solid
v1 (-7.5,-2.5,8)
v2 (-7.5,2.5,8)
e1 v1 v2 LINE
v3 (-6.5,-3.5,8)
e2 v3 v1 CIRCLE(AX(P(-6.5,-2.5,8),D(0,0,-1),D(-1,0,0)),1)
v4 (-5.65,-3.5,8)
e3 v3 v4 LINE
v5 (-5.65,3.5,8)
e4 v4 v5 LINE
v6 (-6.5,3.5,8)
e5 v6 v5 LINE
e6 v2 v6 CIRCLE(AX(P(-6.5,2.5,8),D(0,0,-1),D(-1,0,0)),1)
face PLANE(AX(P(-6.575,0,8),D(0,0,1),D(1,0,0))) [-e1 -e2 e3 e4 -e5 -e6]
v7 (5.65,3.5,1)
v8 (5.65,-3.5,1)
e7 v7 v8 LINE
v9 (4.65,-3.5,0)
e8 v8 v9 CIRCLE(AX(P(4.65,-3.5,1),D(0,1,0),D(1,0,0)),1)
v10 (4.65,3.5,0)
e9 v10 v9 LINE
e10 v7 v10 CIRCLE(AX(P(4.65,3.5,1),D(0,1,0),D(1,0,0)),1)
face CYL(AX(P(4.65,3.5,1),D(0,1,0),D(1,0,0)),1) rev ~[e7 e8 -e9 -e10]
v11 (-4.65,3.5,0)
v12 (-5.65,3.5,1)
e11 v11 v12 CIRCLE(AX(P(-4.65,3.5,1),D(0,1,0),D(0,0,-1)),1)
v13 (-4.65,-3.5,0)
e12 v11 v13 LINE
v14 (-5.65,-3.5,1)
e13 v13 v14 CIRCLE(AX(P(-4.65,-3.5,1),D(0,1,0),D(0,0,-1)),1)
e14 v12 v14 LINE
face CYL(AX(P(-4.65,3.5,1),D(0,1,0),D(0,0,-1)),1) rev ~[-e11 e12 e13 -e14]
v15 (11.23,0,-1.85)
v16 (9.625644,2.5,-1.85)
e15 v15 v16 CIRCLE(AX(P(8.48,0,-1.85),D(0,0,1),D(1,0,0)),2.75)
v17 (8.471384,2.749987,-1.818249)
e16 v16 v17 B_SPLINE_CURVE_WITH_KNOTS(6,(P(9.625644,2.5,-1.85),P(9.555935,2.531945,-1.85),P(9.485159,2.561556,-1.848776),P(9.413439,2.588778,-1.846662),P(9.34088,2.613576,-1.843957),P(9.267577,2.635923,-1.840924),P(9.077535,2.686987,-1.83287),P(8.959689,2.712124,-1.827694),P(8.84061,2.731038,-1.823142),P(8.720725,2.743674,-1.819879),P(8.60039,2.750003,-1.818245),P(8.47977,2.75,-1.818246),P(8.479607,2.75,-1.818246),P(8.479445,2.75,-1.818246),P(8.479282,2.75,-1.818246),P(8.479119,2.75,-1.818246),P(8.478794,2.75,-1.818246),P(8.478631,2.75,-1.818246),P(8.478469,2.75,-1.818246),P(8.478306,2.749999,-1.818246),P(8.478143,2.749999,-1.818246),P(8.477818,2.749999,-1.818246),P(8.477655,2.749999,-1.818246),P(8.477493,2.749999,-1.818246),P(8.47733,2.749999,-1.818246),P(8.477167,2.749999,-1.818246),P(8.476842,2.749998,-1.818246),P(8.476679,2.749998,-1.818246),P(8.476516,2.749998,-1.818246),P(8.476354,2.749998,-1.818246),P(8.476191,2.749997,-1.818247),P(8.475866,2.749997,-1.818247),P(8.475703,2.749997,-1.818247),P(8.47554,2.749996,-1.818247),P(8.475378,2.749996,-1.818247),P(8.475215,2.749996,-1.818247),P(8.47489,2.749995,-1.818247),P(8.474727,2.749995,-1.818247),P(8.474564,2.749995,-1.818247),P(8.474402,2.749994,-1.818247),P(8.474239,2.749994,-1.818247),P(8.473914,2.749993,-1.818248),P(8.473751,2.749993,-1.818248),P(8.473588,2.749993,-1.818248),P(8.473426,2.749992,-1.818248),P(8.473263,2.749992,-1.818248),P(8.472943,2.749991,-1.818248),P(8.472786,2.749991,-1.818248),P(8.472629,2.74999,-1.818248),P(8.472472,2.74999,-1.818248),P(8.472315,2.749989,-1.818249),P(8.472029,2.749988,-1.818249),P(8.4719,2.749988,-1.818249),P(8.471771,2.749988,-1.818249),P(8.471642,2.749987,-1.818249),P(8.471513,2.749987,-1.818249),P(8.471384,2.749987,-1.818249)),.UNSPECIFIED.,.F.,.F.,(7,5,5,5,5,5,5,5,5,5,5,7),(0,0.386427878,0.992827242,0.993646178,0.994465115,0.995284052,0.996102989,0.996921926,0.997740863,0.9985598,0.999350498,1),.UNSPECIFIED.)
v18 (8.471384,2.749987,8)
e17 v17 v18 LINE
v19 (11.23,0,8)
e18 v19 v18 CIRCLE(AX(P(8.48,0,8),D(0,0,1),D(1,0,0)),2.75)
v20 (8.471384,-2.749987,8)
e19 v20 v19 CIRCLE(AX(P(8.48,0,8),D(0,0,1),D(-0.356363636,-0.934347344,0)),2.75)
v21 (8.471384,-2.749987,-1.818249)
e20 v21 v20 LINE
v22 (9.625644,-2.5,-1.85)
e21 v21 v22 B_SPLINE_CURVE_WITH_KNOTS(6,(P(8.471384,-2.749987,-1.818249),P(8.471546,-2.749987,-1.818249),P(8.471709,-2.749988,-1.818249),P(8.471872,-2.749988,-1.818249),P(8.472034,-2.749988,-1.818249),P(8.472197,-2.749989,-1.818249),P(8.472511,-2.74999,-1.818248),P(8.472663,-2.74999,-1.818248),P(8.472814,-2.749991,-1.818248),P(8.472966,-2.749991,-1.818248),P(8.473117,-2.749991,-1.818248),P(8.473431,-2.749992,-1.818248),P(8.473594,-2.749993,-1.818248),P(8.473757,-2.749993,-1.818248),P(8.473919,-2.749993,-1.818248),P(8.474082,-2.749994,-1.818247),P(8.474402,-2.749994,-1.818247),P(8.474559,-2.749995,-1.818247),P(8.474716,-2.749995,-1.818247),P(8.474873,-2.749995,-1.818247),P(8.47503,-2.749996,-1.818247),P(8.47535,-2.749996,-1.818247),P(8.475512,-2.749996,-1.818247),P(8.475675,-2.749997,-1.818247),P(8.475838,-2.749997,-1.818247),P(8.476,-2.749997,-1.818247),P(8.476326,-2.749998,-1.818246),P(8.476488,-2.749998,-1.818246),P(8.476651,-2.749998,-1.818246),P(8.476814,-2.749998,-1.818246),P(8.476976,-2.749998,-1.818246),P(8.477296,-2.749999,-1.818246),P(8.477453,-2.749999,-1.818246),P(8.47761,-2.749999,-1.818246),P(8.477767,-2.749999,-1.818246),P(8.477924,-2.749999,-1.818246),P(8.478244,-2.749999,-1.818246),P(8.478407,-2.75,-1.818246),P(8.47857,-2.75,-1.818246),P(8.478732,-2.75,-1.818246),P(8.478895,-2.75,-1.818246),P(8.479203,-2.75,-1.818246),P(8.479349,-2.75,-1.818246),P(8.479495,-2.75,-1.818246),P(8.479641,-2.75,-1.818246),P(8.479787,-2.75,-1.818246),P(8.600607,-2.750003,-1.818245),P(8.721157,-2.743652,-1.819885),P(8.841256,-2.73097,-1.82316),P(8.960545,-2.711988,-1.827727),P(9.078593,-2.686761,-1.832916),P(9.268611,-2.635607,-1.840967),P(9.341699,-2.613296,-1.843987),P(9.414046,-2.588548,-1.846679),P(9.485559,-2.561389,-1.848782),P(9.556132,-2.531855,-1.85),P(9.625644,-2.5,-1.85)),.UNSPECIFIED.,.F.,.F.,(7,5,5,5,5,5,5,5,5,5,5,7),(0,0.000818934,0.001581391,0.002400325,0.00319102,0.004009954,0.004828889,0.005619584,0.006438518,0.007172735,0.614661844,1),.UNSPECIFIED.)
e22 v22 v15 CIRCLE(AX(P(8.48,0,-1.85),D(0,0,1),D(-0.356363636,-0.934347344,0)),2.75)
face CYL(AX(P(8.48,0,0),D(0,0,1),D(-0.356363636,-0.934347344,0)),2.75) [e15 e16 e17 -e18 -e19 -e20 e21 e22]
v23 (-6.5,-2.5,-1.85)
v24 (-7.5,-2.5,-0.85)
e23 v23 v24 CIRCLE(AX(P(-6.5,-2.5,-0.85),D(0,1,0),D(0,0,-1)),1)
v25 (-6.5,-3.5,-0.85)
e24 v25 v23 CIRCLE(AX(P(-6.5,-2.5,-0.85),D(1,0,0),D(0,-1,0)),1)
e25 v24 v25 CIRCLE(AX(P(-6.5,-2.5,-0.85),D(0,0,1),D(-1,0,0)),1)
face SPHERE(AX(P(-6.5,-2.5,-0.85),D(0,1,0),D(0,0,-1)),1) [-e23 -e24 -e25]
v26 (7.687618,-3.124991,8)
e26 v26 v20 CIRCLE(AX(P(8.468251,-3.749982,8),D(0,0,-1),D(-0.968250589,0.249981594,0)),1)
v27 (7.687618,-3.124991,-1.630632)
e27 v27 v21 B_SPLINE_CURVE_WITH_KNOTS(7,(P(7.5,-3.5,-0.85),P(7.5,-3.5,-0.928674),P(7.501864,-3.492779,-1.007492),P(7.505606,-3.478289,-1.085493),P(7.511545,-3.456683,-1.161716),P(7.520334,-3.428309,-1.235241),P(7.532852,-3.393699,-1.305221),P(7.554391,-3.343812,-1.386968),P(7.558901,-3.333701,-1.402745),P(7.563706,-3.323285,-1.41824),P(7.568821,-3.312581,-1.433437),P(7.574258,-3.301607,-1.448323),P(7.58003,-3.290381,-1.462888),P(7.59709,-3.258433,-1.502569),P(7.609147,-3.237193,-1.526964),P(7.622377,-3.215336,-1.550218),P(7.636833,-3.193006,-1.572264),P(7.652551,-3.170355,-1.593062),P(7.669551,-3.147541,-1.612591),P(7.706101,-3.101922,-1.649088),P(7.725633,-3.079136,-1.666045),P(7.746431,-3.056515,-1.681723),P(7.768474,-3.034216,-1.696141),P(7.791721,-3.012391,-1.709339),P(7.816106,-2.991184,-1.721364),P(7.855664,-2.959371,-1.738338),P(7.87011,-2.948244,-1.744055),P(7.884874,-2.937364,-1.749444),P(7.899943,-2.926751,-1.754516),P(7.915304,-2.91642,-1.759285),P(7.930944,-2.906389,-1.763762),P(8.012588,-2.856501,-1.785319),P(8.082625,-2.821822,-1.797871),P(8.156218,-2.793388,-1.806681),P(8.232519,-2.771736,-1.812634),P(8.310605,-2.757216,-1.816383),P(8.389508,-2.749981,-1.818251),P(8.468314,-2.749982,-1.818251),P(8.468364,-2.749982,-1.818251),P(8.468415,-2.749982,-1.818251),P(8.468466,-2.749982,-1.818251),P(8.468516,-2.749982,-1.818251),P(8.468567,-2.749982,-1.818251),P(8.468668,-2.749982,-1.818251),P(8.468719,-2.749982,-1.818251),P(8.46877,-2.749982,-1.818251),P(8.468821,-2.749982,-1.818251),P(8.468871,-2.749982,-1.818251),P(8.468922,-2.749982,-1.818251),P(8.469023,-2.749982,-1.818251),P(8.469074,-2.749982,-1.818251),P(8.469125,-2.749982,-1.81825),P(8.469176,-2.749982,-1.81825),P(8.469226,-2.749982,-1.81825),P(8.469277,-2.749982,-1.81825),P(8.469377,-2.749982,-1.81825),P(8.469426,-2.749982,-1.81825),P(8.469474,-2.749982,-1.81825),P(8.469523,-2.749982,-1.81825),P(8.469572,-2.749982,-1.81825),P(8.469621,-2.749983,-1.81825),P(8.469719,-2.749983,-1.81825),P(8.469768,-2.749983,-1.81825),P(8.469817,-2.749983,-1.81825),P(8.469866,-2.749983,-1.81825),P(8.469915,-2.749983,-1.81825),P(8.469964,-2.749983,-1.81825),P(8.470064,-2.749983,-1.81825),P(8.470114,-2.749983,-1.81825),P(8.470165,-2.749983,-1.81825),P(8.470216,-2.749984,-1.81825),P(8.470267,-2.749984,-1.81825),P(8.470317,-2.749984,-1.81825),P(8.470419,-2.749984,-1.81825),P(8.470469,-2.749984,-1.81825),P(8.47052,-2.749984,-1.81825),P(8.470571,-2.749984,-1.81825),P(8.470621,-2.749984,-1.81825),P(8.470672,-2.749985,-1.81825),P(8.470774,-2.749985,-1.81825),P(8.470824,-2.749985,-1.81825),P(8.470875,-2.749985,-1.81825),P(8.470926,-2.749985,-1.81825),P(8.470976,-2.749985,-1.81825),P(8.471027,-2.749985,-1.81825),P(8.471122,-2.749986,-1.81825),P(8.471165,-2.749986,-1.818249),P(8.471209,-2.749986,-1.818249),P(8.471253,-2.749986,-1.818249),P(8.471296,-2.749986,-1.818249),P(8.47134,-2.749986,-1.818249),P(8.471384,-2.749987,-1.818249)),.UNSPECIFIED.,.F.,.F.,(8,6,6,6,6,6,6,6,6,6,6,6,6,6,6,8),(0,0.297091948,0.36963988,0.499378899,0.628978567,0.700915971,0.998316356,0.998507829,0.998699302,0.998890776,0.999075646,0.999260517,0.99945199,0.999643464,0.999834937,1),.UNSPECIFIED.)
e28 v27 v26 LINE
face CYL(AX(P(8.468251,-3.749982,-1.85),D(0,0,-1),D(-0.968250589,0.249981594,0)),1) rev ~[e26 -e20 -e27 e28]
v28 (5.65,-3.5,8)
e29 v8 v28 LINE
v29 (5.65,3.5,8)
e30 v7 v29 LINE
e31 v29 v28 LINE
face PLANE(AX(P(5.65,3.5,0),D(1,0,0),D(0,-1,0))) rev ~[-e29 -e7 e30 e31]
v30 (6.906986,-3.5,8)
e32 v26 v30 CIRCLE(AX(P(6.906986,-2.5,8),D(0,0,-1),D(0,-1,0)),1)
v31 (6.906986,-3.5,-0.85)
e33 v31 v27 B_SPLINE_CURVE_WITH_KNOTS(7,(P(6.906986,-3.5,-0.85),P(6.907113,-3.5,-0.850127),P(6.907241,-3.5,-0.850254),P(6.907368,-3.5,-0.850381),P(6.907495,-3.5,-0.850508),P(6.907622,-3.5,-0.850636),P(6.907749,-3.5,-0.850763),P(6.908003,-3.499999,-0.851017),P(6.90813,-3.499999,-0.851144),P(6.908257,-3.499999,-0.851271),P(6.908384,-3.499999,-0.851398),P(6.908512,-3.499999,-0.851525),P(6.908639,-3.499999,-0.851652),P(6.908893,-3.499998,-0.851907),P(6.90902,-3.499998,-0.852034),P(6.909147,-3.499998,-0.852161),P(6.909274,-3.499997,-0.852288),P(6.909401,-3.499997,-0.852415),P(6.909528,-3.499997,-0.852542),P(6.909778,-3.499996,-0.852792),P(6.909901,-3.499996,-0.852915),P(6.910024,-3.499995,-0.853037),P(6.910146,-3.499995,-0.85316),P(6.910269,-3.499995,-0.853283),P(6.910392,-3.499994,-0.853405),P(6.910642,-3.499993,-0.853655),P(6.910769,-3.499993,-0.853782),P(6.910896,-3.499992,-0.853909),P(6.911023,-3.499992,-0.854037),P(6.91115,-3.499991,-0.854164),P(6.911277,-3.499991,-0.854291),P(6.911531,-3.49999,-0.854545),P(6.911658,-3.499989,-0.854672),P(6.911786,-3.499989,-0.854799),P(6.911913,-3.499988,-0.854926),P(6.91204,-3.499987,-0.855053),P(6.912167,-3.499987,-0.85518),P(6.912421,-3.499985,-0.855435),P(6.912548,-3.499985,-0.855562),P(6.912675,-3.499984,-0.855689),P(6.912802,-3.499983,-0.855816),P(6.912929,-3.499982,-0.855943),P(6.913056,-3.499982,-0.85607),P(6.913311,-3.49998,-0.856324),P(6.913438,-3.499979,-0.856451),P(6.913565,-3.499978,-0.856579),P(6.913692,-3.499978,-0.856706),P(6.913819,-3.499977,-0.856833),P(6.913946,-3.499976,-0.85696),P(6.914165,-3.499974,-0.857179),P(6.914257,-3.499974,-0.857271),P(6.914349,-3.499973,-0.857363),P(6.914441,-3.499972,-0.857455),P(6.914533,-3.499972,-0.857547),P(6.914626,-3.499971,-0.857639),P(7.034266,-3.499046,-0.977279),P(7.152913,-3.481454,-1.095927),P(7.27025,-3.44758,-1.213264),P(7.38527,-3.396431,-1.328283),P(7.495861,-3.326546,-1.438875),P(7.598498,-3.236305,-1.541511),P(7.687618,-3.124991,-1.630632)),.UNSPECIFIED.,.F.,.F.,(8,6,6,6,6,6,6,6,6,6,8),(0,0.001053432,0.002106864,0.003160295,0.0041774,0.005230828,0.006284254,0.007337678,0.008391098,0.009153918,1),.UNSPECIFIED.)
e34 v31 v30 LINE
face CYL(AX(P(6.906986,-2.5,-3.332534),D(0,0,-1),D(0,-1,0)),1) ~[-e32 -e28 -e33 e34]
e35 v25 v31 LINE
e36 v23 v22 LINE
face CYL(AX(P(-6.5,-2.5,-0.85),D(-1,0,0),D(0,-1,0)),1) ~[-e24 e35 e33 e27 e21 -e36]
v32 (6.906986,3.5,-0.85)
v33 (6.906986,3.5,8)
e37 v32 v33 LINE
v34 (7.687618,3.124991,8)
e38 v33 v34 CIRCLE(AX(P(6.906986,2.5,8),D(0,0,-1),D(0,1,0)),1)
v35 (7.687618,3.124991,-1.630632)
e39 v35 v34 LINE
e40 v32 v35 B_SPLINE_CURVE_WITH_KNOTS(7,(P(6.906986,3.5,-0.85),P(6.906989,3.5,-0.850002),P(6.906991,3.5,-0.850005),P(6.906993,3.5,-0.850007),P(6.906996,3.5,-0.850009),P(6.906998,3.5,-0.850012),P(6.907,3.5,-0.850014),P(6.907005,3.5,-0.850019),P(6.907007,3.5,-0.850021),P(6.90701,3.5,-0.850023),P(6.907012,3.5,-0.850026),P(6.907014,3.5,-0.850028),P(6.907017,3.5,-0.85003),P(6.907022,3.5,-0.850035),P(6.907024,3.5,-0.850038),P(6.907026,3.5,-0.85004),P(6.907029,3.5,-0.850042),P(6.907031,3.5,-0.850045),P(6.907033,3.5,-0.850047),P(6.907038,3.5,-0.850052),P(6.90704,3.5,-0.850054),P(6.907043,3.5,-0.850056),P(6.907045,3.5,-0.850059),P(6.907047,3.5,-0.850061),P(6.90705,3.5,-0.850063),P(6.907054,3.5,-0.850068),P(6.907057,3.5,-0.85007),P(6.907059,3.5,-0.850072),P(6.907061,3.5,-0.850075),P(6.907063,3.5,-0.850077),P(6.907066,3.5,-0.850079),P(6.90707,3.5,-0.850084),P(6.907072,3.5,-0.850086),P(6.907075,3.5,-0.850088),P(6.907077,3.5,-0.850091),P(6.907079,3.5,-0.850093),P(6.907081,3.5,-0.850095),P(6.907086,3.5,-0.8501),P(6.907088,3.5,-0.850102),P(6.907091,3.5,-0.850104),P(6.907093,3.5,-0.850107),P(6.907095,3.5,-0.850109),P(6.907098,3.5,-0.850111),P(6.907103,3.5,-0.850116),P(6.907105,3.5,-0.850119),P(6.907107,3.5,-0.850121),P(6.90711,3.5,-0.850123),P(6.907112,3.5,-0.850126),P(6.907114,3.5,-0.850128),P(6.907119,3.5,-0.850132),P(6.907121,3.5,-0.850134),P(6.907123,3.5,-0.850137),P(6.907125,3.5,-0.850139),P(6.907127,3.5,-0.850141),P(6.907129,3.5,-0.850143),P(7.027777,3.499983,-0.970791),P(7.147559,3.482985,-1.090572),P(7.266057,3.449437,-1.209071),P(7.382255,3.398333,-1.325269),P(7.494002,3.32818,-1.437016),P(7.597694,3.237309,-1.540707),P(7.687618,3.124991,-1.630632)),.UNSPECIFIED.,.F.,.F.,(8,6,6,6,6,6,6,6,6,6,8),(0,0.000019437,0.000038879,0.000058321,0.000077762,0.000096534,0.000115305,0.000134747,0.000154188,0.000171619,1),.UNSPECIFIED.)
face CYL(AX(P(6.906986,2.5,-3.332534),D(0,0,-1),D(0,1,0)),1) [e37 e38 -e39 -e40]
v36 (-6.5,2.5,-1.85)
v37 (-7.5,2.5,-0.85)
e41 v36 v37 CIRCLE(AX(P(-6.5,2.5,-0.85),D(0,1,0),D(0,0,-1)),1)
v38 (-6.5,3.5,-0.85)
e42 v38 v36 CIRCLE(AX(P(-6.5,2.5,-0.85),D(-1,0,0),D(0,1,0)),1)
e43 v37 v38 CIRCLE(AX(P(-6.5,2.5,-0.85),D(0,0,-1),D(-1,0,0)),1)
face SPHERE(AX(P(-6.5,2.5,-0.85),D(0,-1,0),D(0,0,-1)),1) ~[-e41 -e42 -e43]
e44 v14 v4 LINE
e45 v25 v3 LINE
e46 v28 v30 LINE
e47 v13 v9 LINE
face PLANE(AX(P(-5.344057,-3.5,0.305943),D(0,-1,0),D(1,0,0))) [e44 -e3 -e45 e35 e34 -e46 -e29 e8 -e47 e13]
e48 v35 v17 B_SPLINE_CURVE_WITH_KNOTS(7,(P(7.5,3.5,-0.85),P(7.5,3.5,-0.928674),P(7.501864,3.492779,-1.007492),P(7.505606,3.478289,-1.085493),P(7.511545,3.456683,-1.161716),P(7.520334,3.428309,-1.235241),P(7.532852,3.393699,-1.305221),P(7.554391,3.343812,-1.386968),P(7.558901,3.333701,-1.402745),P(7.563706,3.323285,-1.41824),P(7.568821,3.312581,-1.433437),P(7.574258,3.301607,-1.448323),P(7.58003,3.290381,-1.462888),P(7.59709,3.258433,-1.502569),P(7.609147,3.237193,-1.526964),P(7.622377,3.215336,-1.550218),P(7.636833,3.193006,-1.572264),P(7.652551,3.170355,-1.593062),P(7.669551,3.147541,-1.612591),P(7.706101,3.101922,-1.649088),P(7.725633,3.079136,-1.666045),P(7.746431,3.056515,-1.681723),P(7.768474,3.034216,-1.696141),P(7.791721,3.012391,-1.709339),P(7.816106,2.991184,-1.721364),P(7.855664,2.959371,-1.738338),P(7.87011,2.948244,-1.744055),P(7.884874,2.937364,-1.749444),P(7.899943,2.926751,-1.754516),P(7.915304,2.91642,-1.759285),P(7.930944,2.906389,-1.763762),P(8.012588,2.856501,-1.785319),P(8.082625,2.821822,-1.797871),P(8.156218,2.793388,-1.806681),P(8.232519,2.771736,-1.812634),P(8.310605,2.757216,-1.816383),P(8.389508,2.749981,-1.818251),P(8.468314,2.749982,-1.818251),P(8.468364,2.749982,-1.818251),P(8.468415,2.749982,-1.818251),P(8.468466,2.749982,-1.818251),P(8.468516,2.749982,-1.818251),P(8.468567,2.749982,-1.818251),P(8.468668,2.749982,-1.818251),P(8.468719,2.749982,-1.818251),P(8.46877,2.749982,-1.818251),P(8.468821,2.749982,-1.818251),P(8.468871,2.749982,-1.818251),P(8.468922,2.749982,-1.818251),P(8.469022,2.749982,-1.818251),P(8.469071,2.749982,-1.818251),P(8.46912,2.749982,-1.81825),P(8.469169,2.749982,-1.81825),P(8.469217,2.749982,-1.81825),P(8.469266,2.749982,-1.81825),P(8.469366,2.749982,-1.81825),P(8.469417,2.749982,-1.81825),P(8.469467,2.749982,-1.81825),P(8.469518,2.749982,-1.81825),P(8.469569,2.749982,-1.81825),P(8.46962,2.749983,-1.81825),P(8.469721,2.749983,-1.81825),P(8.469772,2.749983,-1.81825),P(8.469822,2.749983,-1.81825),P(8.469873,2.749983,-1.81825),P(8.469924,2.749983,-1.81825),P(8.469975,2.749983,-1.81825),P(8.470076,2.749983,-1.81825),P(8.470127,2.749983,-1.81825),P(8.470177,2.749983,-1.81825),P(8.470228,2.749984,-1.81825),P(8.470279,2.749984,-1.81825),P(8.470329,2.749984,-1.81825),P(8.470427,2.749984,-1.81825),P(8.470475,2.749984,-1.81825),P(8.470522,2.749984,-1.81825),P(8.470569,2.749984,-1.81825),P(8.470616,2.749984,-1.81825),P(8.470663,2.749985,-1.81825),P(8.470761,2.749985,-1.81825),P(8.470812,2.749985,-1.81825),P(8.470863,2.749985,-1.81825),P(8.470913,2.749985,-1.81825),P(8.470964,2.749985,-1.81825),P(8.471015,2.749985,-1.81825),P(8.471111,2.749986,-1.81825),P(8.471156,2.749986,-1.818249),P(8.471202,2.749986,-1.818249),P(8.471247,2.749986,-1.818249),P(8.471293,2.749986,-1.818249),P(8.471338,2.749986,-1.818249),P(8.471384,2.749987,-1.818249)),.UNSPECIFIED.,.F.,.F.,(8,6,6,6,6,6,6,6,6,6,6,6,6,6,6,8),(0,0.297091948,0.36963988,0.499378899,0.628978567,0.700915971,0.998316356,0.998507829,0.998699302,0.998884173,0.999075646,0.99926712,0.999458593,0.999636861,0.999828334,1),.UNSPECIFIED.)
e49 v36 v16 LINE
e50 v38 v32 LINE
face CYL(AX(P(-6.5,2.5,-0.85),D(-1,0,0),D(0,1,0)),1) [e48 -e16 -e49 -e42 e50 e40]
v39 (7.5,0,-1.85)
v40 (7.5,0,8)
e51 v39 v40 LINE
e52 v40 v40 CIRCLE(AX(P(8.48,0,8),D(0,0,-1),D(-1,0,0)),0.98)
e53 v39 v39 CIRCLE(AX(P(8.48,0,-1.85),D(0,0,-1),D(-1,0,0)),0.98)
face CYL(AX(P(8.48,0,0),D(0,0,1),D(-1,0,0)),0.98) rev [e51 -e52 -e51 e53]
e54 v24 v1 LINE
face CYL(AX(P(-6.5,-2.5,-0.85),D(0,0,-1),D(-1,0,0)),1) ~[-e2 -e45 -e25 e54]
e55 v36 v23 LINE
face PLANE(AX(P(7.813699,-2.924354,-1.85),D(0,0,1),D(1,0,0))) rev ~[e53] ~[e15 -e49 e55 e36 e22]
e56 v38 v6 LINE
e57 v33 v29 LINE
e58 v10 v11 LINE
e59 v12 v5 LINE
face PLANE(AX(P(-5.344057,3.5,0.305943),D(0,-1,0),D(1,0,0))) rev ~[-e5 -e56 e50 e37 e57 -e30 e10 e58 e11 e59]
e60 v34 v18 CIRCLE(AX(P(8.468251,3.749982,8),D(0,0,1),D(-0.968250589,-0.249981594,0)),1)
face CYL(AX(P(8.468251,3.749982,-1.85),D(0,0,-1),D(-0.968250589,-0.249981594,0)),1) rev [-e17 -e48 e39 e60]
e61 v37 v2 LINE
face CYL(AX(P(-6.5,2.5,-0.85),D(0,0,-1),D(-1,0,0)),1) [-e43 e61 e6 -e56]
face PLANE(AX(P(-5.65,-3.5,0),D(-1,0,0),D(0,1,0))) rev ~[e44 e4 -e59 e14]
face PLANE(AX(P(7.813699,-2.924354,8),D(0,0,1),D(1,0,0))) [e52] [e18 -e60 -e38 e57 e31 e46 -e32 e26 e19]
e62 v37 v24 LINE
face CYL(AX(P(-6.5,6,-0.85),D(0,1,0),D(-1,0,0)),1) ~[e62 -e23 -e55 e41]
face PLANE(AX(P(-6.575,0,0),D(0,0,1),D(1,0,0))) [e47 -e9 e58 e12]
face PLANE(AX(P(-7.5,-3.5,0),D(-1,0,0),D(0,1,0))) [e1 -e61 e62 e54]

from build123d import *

# Parameters (mm, degrees)
F0_W         = 1.85
F0_H         = 7
F0_W_2       = 11.3
F1_DEPTH     = 1.85
F2_DEPTH     = 8
F3_T1_DEPTH  = 9.85
F3_T3_DEPTH  = 9.85
F3_T5_DEPTH  = 7
F3_T7_DEPTH  = 7
F3_T9_DEPTH  = 12
F4_T1_DEPTH  = 11.35
F4_T3_DEPTH  = 16.5
F4_T5_DEPTH  = 12.8150682373
F4_T8_ANGLE  = 90.0000000053
F4_T10_ANGLE = 90.0000000053


# Not quite as in the source:
# - a fillet or chamfer that OpenCascade refuses, or shapes differently, is made with other operations: its cross-section is extruded or revolved along the edge and cut away or added


with BuildPart() as f1:
    # F0 (on Top) → F1 (new body)
    with BuildSketch(Plane.XY):
        with Locations((-6.575, 0)):
            Rectangle(F0_W, F0_H)
        Rectangle(F0_W_2, F0_H)
        with BuildLine():
            Line((7.5, 0), (7.5, 2.5694551952))
            ThreePointArc((7.5, 2.5694551952), (5.73, 0), (7.5, -2.5694551952))
            Line((7.5, -2.5694551952), (7.5, 0))
        make_face()
        with BuildLine():
            Line((7.5, 2.5694551952), (7.5, 3.5))
            Line((7.5, 3.5), (5.65, 3.5))
            Line((5.65, 3.5), (5.65, -3.5))
            Line((5.65, -3.5), (7.5, -3.5))
            Line((7.5, -3.5), (7.5, -2.5694551952))
            ThreePointArc((7.5, -2.5694551952), (5.73, 0), (7.5, 2.5694551952))
        make_face()
        with BuildLine():
            ThreePointArc((11.23, 0), (10.0400480762, 2.2646743695), (7.5, 2.5694551952))
            Line((7.5, 2.5694551952), (7.5, 0))
            Line((7.5, 0), (7.5, -2.5694551952))
            ThreePointArc((7.5, -2.5694551952), (10.0400480762, -2.2646743695), (11.23, 0))
        make_face()
        with BuildLine():
            ThreePointArc((9.46, 0), (8.48, -0.98), (7.5, 0))
            ThreePointArc((7.5, 0), (8.48, 0.98), (9.46, 0))
        make_face(mode=Mode.SUBTRACT)
    extrude(amount=-F1_DEPTH)

    # F0 (on Top) → F2 (join)
    with BuildSketch(Plane.XY):
        with Locations((-6.575, 0)):
            Rectangle(F0_W, F0_H)
        with BuildLine():
            Line((7.5, 2.5694551952), (7.5, 3.5))
            Line((7.5, 3.5), (5.65, 3.5))
            Line((5.65, 3.5), (5.65, -3.5))
            Line((5.65, -3.5), (7.5, -3.5))
            Line((7.5, -3.5), (7.5, -2.5694551952))
            ThreePointArc((7.5, -2.5694551952), (5.73, 0), (7.5, 2.5694551952))
        make_face()
        with BuildLine():
            Line((7.5, 0), (7.5, 2.5694551952))
            ThreePointArc((7.5, 2.5694551952), (5.73, 0), (7.5, -2.5694551952))
            Line((7.5, -2.5694551952), (7.5, 0))
        make_face()
        with BuildLine():
            ThreePointArc((11.23, 0), (10.0400480762, 2.2646743695), (7.5, 2.5694551952))
            Line((7.5, 2.5694551952), (7.5, 0))
            Line((7.5, 0), (7.5, -2.5694551952))
            ThreePointArc((7.5, -2.5694551952), (10.0400480762, -2.2646743695), (11.23, 0))
        make_face()
        with BuildLine():
            ThreePointArc((9.46, 0), (8.48, -0.98), (7.5, 0))
            ThreePointArc((7.5, 0), (8.48, 0.98), (9.46, 0))
        make_face(mode=Mode.SUBTRACT)
    extrude(amount=F2_DEPTH)

    # F3: fillet of radius 1 on 5 edges, made by hand

    # F3_s2 → F3_t1 (join)
    with BuildSketch(Plane.XY.offset(-1.85)):
        with BuildLine():
            ThreePointArc((7.5, 3.5), (7.8571098794, 2.9584596209), (8.4713837652, 2.7499865019))
            ThreePointArc((8.4713837652, 2.7499865019), (7.9775177584, 2.7037033116), (7.5, 2.5694551952))
            Line((7.5, 2.5694551952), (7.5, 3.5))
        make_face()
    extrude(amount=F3_T1_DEPTH)

    # F3_s4 → F3_t3 (join)
    with BuildSketch(Plane.XY.offset(-1.85)):
        with BuildLine():
            ThreePointArc((7.5, -3.5), (7.8571098794, -2.9584596209), (8.4713837652, -2.7499865019))
            ThreePointArc((8.4713837652, -2.7499865019), (7.9775177584, -2.7037033116), (7.5, -2.5694551952))
            Line((7.5, -2.5694551952), (7.5, -3.5))
        make_face()
    extrude(amount=F3_T3_DEPTH)

    # F3_s6 → F3_t5 (join)
    with BuildSketch(Plane.XZ.offset(-3.5)):
        with BuildLine():
            ThreePointArc((5.65, 1), (5.3571067812, 0.2928932188), (4.65, 0))
            Line((4.65, 0), (5.65, 0))
            Line((5.65, 0), (5.65, 1))
        make_face()
    extrude(amount=F3_T5_DEPTH)

    # F3_s8 → F3_t7 (join)
    with BuildSketch(Plane.XZ.offset(-3.5)):
        with BuildLine():
            ThreePointArc((-4.65, 0), (-5.3571067812, 0.2928932188), (-5.65, 1))
            Line((-5.65, 1), (-5.65, 0))
            Line((-5.65, 0), (-4.65, 0))
        make_face()
    extrude(amount=F3_T7_DEPTH)

    # F3_s10 → F3_t9 (cut)
    with BuildSketch(Plane.XZ.offset(-6)):
        with BuildLine():
            ThreePointArc((-7.5, -0.85), (-7.2071067812, -1.5571067812), (-6.5, -1.85))
            Line((-6.5, -1.85), (-7.5, -1.85))
            Line((-7.5, -1.85), (-7.5, -0.85))
        make_face()
    extrude(amount=F3_T9_DEPTH, mode=Mode.SUBTRACT)

    # F4: fillet of radius 1 on 8 edges, made by hand

    # F4_s2 → F4_t1 (cut)
    with BuildSketch(Plane.XY.offset(-0.85)):
        with BuildLine():
            ThreePointArc((-7.5, 2.5), (-7.2071067812, 3.2071067812), (-6.5, 3.5))
            Line((-6.5, 3.5), (-7.5, 3.5))
            Line((-7.5, 3.5), (-7.5, 2.5))
        make_face()
        with BuildLine():
            ThreePointArc((-7.5, -2.5), (-7.2071067812, -3.2071067812), (-6.5, -3.5))
            Line((-6.5, -3.5), (-7.5, -3.5))
            Line((-7.5, -3.5), (-7.5, -2.5))
        make_face()
    extrude(amount=F4_T1_DEPTH, mode=Mode.SUBTRACT)

    # F4_s4 → F4_t3 (cut)
    with BuildSketch(Plane.YZ.offset(-6.5)):
        with BuildLine():
            ThreePointArc((3.5, -0.85), (3.2071067812, -1.5571067812), (2.5, -1.85))
            Line((2.5, -1.85), (3.5, -1.85))
            Line((3.5, -1.85), (3.5, -0.85))
        make_face()
        with BuildLine():
            ThreePointArc((-3.5, -0.85), (-3.2071067812, -1.5571067812), (-2.5, -1.85))
            Line((-2.5, -1.85), (-3.5, -1.85))
            Line((-3.5, -1.85), (-3.5, -0.85))
        make_face()
    extrude(amount=F4_T3_DEPTH, mode=Mode.SUBTRACT)

    # F4_s6 → F4_t5 (cut)
    with BuildSketch(Plane.XY.offset(-3.3325341187)):
        with BuildLine():
            ThreePointArc((6.9069863525, 3.5), (7.3400043679, 3.4013852663), (7.6876184707, 3.1249907968))
            ThreePointArc((7.6876184707, 3.1249907968), (7.5739320459, 3.3025507681), (7.5, 3.5))
            Line((7.5, 3.5), (6.9069863525, 3.5))
        make_face()
        with BuildLine():
            ThreePointArc((6.9069863525, -3.5), (7.3400043679, -3.4013852663), (7.6876184707, -3.1249907968))
            ThreePointArc((7.6876184707, -3.1249907968), (7.5739320459, -3.3025507681), (7.5, -3.5))
            Line((7.5, -3.5), (6.9069863525, -3.5))
        make_face()
    extrude(amount=F4_T5_DEPTH, mode=Mode.SUBTRACT)

    # F4_s7 → F4_t8 (revolve, cut)
    with BuildSketch(Plane.YZ.offset(-6.5)):
        with BuildLine():
            ThreePointArc((3.5, -0.85), (3.2071067812, -1.5571067812), (2.5, -1.85))
            Line((2.5, -1.85), (3.5, -1.85))
            Line((3.5, -1.85), (3.5, -0.85))
        make_face()
    revolve(axis=Axis((-6.5, 3.5, -0.85), (0, 1, 0)), revolution_arc=F4_T8_ANGLE, mode=Mode.SUBTRACT)

    # F4_s9 → F4_t10 (revolve, cut)
    with BuildSketch(Plane.YZ.offset(-6.5)):
        with BuildLine():
            ThreePointArc((-3.5, -0.85), (-3.2071067812, -1.5571067812), (-2.5, -1.85))
            Line((-2.5, -1.85), (-3.5, -1.85))
            Line((-3.5, -1.85), (-3.5, -0.85))
        make_face()
    revolve(axis=Axis((-6.5, -3.5, -0.85), (0, 1, 0)), revolution_arc=F4_T10_ANGLE, mode=Mode.SUBTRACT)


solid = f1.part
